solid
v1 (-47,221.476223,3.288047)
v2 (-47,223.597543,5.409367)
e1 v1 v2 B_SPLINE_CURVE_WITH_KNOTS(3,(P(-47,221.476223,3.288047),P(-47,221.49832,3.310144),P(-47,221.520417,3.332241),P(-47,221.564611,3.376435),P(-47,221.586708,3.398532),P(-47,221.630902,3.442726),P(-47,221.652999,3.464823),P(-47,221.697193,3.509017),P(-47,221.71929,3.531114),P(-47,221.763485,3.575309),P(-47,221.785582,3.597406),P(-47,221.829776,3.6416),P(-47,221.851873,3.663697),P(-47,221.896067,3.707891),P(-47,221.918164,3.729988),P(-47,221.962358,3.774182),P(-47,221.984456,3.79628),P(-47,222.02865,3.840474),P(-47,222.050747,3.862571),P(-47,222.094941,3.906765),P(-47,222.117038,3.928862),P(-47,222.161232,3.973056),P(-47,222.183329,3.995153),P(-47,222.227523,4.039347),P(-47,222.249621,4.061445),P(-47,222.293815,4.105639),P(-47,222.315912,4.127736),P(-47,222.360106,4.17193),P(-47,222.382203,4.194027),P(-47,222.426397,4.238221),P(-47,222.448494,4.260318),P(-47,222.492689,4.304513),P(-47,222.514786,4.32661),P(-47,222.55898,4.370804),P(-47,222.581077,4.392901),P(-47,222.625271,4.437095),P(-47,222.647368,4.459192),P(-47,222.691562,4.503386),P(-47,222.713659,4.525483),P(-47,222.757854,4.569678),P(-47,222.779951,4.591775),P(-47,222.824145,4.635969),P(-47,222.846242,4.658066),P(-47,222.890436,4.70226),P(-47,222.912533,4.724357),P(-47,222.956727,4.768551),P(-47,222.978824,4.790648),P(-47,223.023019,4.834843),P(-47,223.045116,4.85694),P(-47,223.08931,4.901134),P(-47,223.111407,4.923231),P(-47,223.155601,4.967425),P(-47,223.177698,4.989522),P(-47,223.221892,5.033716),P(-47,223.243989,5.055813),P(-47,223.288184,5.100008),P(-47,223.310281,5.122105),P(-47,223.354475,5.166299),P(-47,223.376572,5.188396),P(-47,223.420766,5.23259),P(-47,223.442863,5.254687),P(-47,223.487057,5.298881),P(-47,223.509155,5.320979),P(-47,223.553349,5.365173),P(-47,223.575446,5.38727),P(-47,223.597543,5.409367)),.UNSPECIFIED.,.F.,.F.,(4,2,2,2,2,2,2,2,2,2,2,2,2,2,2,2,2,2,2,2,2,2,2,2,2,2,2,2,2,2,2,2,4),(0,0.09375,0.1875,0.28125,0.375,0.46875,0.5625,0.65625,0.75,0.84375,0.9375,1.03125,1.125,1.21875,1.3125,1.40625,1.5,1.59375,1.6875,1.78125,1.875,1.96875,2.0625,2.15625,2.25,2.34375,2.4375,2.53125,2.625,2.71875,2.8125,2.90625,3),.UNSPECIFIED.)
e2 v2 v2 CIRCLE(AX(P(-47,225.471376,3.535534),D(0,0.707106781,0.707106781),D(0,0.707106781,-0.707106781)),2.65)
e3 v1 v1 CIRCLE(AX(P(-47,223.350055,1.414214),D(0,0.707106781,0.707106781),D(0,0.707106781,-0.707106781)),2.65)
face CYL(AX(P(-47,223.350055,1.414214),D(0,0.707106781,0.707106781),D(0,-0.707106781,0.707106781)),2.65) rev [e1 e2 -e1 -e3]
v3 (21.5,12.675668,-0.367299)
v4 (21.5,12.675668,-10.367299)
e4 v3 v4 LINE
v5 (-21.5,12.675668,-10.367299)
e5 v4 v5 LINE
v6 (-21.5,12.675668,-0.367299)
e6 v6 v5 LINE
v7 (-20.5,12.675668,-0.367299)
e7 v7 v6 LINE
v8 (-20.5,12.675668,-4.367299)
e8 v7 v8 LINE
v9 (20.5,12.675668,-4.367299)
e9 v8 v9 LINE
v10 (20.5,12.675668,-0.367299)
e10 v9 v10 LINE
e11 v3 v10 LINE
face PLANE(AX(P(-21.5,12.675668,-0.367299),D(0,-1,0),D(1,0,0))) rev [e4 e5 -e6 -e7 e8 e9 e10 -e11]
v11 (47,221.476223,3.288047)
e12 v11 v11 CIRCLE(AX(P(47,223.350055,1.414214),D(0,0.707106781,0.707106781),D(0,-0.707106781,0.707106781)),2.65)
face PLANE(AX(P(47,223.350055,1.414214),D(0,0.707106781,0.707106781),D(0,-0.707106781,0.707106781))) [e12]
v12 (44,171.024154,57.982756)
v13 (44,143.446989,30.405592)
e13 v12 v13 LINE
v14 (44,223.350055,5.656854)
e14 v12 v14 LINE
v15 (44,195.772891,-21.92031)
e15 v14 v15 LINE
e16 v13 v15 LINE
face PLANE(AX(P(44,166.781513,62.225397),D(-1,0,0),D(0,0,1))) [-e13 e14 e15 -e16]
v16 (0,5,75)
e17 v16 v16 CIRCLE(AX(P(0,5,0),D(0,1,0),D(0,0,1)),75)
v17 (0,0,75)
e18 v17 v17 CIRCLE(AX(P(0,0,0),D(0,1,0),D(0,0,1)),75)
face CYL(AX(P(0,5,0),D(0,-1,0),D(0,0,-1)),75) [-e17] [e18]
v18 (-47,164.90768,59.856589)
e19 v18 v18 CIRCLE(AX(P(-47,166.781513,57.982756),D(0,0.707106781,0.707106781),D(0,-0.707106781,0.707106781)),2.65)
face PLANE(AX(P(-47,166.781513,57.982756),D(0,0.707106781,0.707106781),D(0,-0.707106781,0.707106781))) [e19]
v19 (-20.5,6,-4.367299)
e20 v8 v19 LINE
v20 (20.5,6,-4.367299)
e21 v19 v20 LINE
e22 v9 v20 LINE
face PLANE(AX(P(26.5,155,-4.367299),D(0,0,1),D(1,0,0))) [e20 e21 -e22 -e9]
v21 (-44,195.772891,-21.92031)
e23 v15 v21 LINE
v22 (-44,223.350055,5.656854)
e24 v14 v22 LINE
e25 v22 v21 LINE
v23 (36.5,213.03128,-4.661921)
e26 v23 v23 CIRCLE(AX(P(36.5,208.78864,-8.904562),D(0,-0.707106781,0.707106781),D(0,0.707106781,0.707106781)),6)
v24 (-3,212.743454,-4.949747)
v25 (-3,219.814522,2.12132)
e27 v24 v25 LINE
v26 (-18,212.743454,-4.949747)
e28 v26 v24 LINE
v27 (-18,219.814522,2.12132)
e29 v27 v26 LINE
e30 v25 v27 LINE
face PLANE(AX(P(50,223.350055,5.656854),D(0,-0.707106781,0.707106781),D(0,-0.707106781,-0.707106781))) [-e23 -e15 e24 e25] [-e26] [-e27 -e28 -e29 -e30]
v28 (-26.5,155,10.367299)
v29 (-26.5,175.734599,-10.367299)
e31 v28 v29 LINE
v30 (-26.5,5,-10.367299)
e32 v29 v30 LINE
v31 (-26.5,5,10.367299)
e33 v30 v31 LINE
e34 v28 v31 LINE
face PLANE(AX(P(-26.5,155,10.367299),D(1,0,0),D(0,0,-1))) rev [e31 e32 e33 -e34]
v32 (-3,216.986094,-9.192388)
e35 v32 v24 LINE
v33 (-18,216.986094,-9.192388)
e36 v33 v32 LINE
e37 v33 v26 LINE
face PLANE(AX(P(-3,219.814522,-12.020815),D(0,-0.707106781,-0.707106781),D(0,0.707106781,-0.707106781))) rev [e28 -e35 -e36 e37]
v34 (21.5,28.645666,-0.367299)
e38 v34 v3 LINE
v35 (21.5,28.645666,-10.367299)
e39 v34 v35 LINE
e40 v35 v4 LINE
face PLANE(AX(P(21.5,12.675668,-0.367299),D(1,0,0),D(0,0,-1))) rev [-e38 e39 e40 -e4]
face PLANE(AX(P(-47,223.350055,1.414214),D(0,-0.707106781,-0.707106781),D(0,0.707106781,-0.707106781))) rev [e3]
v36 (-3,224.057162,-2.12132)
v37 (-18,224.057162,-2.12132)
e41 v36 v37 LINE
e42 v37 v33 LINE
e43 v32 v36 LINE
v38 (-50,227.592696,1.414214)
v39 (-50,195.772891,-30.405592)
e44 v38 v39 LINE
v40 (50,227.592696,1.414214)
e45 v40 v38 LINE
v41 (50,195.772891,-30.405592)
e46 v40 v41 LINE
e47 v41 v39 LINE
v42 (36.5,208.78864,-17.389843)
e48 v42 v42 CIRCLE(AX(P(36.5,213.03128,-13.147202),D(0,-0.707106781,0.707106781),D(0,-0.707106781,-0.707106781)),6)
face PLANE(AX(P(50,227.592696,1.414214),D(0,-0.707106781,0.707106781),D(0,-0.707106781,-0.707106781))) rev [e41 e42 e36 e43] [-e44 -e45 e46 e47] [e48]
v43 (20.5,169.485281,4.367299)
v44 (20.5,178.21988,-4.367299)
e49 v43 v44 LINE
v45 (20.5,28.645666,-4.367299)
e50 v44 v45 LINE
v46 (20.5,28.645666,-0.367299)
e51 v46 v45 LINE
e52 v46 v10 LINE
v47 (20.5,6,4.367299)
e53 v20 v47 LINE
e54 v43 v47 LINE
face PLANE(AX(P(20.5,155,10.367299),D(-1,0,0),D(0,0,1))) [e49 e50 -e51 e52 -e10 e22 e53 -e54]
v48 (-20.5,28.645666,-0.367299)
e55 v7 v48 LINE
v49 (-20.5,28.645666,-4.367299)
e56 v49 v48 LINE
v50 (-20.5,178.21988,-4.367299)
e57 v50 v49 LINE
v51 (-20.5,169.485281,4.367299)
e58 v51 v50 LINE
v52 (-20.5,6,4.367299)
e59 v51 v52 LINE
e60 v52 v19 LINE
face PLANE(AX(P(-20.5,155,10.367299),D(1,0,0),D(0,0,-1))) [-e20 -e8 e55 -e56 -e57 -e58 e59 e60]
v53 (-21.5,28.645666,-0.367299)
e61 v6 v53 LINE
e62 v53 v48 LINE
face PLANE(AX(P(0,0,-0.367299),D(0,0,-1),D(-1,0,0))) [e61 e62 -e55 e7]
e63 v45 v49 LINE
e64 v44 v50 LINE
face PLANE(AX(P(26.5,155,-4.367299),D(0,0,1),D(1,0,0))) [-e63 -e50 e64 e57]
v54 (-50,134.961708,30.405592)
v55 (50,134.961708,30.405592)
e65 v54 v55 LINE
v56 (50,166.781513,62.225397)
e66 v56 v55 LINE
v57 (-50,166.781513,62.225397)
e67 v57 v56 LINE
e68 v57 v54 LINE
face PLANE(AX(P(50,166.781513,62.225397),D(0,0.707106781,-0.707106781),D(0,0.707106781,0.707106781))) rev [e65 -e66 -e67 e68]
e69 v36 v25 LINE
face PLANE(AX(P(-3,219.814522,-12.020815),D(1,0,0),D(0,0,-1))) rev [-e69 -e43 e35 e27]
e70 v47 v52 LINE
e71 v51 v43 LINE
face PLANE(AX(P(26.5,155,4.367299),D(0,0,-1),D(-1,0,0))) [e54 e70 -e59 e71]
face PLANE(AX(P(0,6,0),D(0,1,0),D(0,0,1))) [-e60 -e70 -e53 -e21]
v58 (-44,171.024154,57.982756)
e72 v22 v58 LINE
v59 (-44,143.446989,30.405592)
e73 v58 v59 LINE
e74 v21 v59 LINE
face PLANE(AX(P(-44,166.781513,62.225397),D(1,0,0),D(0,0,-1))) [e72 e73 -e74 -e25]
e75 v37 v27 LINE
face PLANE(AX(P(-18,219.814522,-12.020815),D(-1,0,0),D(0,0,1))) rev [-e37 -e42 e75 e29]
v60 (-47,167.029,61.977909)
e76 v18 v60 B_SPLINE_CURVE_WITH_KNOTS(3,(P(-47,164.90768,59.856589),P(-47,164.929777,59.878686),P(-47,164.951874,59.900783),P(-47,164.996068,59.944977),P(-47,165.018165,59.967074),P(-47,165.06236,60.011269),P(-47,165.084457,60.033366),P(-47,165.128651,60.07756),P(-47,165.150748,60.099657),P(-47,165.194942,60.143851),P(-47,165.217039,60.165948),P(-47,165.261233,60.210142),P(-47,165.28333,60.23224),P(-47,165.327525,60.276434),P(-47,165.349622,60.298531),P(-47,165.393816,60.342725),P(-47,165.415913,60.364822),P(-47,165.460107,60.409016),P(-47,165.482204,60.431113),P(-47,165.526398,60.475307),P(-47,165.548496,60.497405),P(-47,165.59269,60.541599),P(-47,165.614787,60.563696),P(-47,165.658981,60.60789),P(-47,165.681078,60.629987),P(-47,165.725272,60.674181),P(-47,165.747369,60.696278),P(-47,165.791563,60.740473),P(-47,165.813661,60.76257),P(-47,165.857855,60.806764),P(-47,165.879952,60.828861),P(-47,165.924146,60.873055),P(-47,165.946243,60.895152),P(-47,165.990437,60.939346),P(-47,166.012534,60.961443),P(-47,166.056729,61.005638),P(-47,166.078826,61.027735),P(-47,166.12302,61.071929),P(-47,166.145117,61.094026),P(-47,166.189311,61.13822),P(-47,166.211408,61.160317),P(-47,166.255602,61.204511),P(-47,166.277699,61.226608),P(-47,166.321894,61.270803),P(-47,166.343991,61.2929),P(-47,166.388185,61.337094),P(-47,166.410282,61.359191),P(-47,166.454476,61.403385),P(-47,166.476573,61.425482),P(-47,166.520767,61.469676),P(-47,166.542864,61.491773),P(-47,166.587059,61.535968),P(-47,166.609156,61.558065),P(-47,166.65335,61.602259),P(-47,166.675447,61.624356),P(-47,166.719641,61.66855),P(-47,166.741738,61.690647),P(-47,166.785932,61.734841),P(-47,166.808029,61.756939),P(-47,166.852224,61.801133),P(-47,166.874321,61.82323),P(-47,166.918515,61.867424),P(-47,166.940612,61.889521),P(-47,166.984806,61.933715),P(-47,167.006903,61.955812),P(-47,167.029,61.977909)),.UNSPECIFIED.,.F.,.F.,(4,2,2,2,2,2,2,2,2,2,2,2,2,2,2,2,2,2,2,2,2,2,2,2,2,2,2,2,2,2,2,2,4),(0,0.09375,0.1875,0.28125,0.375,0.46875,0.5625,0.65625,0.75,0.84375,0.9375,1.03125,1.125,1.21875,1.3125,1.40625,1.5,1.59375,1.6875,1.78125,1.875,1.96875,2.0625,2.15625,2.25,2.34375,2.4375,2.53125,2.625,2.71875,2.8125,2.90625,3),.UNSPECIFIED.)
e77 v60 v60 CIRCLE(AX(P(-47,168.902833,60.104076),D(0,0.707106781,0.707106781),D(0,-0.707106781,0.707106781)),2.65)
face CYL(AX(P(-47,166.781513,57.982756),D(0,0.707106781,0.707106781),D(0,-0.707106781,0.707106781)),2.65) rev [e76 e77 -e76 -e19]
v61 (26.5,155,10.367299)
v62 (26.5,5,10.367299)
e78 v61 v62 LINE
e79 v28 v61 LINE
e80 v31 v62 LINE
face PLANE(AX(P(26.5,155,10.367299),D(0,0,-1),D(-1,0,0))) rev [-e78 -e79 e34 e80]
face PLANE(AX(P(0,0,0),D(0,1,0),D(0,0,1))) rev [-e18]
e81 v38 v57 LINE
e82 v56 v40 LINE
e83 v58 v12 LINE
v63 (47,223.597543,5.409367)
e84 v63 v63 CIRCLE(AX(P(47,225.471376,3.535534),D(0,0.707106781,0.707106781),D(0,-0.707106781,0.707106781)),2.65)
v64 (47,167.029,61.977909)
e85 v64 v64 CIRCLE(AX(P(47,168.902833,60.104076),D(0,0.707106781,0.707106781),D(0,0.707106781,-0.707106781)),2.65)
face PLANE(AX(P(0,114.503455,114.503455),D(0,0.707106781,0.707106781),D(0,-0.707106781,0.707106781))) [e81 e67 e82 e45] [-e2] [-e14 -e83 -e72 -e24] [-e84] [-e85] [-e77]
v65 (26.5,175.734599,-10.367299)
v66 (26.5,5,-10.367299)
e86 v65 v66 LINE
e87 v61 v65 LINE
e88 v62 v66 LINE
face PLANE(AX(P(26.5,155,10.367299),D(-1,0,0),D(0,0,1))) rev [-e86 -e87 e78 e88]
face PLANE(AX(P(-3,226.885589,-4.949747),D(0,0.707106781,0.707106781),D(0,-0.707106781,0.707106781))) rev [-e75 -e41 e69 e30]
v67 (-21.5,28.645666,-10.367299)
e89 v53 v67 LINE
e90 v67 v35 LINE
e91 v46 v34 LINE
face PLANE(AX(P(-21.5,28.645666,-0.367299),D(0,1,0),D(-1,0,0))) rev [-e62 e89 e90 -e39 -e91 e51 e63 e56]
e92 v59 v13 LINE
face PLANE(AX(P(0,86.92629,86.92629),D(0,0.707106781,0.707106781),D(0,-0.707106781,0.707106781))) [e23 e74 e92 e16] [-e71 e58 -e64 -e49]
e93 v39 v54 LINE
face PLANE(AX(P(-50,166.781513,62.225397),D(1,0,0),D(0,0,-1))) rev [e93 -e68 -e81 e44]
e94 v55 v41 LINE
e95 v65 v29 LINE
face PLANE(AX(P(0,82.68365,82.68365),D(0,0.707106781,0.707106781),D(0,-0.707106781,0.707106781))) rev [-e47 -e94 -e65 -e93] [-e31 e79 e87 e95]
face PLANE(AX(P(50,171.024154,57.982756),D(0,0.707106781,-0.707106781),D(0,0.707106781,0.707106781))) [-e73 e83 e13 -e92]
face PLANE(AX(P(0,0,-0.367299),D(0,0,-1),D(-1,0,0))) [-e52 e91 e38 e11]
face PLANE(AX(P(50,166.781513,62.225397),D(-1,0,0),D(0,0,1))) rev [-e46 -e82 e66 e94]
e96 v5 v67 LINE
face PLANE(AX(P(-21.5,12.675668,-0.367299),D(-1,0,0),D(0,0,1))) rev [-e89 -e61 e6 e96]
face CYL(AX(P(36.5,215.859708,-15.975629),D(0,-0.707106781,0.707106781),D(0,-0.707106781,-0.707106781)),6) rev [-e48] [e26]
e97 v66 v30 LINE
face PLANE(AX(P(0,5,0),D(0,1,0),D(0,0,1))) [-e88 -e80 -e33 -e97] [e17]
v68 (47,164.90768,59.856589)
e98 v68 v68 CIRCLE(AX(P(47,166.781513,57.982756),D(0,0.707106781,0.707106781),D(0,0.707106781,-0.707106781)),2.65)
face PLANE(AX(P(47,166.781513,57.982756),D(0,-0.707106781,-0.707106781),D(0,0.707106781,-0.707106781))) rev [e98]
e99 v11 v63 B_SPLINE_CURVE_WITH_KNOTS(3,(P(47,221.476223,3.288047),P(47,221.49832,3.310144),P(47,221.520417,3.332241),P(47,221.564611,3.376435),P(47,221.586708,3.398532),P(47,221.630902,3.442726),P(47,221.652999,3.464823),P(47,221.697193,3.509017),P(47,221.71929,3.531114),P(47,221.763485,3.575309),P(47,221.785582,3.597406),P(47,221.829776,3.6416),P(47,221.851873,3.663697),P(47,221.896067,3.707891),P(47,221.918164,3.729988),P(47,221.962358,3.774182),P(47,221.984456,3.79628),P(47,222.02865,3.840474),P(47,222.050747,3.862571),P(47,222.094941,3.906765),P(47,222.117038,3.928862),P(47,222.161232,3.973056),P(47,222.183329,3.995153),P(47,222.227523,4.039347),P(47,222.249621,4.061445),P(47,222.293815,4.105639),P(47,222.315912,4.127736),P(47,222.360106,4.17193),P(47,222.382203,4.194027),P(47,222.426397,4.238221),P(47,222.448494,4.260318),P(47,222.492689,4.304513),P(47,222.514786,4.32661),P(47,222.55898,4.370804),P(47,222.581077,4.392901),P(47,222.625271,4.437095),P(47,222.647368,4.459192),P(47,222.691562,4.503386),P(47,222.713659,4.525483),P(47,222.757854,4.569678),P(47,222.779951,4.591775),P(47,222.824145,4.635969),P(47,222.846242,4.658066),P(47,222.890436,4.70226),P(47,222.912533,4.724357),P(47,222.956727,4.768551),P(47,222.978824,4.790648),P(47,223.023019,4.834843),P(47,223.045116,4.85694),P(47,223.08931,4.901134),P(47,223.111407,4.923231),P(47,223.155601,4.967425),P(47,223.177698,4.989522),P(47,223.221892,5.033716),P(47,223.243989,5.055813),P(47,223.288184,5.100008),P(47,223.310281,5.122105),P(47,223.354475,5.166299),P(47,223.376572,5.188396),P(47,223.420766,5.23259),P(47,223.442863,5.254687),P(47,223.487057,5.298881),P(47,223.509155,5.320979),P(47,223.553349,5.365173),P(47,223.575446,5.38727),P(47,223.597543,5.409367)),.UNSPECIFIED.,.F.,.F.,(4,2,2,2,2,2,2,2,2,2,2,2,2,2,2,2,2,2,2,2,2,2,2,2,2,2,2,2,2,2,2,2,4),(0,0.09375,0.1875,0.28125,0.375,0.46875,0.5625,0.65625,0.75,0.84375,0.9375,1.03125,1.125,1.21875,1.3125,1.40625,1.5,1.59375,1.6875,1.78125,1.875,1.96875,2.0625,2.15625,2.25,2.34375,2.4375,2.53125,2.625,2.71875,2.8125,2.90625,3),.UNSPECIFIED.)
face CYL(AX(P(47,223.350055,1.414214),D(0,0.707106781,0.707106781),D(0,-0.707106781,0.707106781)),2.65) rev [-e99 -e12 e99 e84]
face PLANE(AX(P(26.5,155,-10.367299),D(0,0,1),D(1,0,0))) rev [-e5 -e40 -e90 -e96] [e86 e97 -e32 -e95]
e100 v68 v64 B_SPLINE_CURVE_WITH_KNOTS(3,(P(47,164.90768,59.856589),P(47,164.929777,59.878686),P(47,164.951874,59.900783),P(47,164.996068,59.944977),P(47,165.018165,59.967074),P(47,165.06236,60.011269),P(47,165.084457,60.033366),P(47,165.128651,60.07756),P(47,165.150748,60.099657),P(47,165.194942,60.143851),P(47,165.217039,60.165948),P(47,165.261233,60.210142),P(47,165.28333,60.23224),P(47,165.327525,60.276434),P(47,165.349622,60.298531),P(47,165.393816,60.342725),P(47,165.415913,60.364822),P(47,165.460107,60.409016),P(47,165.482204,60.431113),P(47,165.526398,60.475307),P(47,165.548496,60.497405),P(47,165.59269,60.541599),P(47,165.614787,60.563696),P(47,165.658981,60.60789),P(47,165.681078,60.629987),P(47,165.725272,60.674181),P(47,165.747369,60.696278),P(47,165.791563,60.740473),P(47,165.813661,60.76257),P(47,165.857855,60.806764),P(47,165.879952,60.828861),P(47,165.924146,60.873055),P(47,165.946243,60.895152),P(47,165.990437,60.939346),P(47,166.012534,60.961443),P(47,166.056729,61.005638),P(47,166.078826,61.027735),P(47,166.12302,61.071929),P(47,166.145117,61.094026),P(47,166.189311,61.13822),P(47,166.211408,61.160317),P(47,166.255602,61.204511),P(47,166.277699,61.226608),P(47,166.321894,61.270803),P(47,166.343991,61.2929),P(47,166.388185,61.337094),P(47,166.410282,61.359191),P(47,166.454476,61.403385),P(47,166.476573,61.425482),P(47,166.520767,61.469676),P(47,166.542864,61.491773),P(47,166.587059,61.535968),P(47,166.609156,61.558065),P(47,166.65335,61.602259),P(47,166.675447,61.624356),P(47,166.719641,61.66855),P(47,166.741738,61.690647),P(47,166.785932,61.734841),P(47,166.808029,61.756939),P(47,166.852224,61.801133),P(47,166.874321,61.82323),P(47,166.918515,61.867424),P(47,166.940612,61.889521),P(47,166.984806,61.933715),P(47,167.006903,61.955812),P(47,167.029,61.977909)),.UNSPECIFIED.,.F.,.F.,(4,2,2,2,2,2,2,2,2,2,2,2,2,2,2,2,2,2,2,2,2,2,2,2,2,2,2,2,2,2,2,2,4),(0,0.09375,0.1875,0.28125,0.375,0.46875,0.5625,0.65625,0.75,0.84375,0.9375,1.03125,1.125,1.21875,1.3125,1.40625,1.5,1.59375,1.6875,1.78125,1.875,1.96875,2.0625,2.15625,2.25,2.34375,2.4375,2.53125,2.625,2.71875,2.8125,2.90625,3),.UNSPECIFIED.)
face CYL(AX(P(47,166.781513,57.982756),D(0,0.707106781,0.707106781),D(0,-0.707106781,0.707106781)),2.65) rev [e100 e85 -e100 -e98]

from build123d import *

# Parameters (mm, degrees)
SKETCH1_R           = 75
BOSS_EXTRUDE1_DEPTH = 5
SKETCH2_W           = 53
SKETCH2_H           = 20.734598854
BOSS_EXTRUDE2_DEPTH = 150
BOSS_EXTRUDE3_DEPTH = 53
SKETCH4_W           = 100
SKETCH4_H           = 86
BOSS_EXTRUDE4_DEPTH = 45
SHELL1_START        = -44
SHELL1_DEPTH        = 88
SHELL1_START_2      = -20.5
SHELL1_2_DEPTH      = 41
SKETCH5_W           = 88
SKETCH5_H           = 74
CUT_EXTRUDE1_DEPTH  = 10
SKETCH7_R           = 6
CUT_EXTRUDE2_DEPTH  = 10
SKETCH8_W           = 43
SKETCH8_H           = 15.969997916
CUT_EXTRUDE3_DEPTH  = 10
SKETCH10_R          = 2.65
CUT_EXTRUDE4_DEPTH  = 3
SKETCH12_W          = 15
SKETCH12_H          = 10
CUT_EXTRUDE5_DEPTH  = 10


# Read off the part's stored shape, not the designer's step: Shell1
with BuildPart() as part:
    # Sketch1 → Boss-Extrude1 (new body)
    with BuildSketch(Plane(origin=(0, 0, 0), x_dir=(1, 0, 0), z_dir=(0, 1, 0))):
        with Locations(Location((0, 0, 0), (0, 0, 270))):
            Circle(SKETCH1_R)
    extrude(amount=BOSS_EXTRUDE1_DEPTH)

    # Sketch2 → Boss-Extrude2 (add)
    with BuildSketch(Plane(origin=(0, 5, 0), x_dir=(1, 0, 0), z_dir=(0, 1, 0))):
        Rectangle(SKETCH2_W, SKETCH2_H)
    extrude(amount=BOSS_EXTRUDE2_DEPTH)

    # Sketch3 → Boss-Extrude3 (add)
    with BuildSketch(Plane.ZY.offset(26.5)):
        Polygon((-10.367299427, 155), (-10.367299427, 175.734598855), (10.367299427, 155), align=None)
    extrude(amount=-BOSS_EXTRUDE3_DEPTH)

    # Sketch4 → Boss-Extrude4 (add)
    with BuildSketch(Plane(origin=(0, 82.683649714, 82.683649714), x_dir=(1, 0, 0), z_dir=(0, 0.7071067811865513, 0.7071067811865438))):
        with Locations((0, 116.932338812)):
            Rectangle(SKETCH4_W, SKETCH4_H)
    extrude(amount=BOSS_EXTRUDE4_DEPTH)

    # Shell1 outline → Shell1 (cut)
    with BuildSketch(Plane.YZ.offset(SHELL1_START)):
        Polygon((143.446989211, 30.405591591), (195.772891018, -21.920310217), (219.107414798, 1.414213562), (166.78151299, 53.74011537), align=None)
    extrude(amount=SHELL1_DEPTH, mode=Mode.SUBTRACT)

    # Shell1 2 outline → Shell1 2 (cut)
    with BuildSketch(Plane.YZ.offset(SHELL1_START_2)):
        Polygon((6, 4.367299427), (6, -4.367299427), (178.219880229, -4.367299427), (169.485281374, 4.367299427), align=None)
    extrude(amount=SHELL1_2_DEPTH, mode=Mode.SUBTRACT)

    # Sketch5 → Cut-Extrude1 (cut)
    with BuildSketch(Plane(origin=(0, 114.503454867, 114.503454867), x_dir=(1, 0, 0), z_dir=(0, 0.7071067811865512, 0.7071067811865438))):
        with Locations((0, 116.932338812)):
            Rectangle(SKETCH5_W, SKETCH5_H)
    extrude(amount=-CUT_EXTRUDE1_DEPTH, mode=Mode.SUBTRACT)

    # Sketch7 → Cut-Extrude2 (cut)
    with BuildSketch(Plane(origin=(0, 108.846600618, -108.846600618), x_dir=(1, 0, 0), z_dir=(0, -0.7071067811865438, 0.7071067811865512))):
        with Locations(Location((36.5, 141.33938714, 0), (0, 0, 270))):
            Circle(SKETCH7_R)
    extrude(amount=-CUT_EXTRUDE2_DEPTH, mode=Mode.SUBTRACT)

    # Sketch8 → Cut-Extrude3 (cut)
    with BuildSketch(Plane(origin=(0, 0, -10.367299427), x_dir=(-1, 0, 0), z_dir=(0, 0, -1))):
        with Locations((0, 20.660666548)):
            Rectangle(SKETCH8_W, SKETCH8_H)
    extrude(amount=-CUT_EXTRUDE3_DEPTH, mode=Mode.SUBTRACT)

    # Sketch10 → Cut-Extrude4 (cut)
    with BuildSketch(Plane(origin=(0, 114.503454867, 114.503454867), x_dir=(1, 0, 0), z_dir=(0, 0.7071067811865512, 0.7071067811865438))):
        with Locations(Location((-47, 76.932338812, 0), (0, 0, 270))):
            Circle(SKETCH10_R)
        with Locations(Location((-47, 156.932338812, 0), (0, 0, 270))):
            Circle(SKETCH10_R)
        with Locations(Location((47, 76.932338812, 0), (0, 0, 270))):
            Circle(SKETCH10_R)
        with Locations(Location((47, 156.932338812, 0), (0, 0, 270))):
            Circle(SKETCH10_R)
    extrude(amount=-CUT_EXTRUDE4_DEPTH, mode=Mode.SUBTRACT)

    # Sketch12 → Cut-Extrude5 (cut)
    with BuildSketch(Plane(origin=(0, 108.846600618, -108.846600618), x_dir=(1, 0, 0), z_dir=(0, -0.7071067811865438, 0.7071067811865512))):
        with Locations((-10.5, 151.932338812)):
            Rectangle(SKETCH12_W, SKETCH12_H)
    extrude(amount=-CUT_EXTRUDE5_DEPTH, mode=Mode.SUBTRACT)


solid = part.part
